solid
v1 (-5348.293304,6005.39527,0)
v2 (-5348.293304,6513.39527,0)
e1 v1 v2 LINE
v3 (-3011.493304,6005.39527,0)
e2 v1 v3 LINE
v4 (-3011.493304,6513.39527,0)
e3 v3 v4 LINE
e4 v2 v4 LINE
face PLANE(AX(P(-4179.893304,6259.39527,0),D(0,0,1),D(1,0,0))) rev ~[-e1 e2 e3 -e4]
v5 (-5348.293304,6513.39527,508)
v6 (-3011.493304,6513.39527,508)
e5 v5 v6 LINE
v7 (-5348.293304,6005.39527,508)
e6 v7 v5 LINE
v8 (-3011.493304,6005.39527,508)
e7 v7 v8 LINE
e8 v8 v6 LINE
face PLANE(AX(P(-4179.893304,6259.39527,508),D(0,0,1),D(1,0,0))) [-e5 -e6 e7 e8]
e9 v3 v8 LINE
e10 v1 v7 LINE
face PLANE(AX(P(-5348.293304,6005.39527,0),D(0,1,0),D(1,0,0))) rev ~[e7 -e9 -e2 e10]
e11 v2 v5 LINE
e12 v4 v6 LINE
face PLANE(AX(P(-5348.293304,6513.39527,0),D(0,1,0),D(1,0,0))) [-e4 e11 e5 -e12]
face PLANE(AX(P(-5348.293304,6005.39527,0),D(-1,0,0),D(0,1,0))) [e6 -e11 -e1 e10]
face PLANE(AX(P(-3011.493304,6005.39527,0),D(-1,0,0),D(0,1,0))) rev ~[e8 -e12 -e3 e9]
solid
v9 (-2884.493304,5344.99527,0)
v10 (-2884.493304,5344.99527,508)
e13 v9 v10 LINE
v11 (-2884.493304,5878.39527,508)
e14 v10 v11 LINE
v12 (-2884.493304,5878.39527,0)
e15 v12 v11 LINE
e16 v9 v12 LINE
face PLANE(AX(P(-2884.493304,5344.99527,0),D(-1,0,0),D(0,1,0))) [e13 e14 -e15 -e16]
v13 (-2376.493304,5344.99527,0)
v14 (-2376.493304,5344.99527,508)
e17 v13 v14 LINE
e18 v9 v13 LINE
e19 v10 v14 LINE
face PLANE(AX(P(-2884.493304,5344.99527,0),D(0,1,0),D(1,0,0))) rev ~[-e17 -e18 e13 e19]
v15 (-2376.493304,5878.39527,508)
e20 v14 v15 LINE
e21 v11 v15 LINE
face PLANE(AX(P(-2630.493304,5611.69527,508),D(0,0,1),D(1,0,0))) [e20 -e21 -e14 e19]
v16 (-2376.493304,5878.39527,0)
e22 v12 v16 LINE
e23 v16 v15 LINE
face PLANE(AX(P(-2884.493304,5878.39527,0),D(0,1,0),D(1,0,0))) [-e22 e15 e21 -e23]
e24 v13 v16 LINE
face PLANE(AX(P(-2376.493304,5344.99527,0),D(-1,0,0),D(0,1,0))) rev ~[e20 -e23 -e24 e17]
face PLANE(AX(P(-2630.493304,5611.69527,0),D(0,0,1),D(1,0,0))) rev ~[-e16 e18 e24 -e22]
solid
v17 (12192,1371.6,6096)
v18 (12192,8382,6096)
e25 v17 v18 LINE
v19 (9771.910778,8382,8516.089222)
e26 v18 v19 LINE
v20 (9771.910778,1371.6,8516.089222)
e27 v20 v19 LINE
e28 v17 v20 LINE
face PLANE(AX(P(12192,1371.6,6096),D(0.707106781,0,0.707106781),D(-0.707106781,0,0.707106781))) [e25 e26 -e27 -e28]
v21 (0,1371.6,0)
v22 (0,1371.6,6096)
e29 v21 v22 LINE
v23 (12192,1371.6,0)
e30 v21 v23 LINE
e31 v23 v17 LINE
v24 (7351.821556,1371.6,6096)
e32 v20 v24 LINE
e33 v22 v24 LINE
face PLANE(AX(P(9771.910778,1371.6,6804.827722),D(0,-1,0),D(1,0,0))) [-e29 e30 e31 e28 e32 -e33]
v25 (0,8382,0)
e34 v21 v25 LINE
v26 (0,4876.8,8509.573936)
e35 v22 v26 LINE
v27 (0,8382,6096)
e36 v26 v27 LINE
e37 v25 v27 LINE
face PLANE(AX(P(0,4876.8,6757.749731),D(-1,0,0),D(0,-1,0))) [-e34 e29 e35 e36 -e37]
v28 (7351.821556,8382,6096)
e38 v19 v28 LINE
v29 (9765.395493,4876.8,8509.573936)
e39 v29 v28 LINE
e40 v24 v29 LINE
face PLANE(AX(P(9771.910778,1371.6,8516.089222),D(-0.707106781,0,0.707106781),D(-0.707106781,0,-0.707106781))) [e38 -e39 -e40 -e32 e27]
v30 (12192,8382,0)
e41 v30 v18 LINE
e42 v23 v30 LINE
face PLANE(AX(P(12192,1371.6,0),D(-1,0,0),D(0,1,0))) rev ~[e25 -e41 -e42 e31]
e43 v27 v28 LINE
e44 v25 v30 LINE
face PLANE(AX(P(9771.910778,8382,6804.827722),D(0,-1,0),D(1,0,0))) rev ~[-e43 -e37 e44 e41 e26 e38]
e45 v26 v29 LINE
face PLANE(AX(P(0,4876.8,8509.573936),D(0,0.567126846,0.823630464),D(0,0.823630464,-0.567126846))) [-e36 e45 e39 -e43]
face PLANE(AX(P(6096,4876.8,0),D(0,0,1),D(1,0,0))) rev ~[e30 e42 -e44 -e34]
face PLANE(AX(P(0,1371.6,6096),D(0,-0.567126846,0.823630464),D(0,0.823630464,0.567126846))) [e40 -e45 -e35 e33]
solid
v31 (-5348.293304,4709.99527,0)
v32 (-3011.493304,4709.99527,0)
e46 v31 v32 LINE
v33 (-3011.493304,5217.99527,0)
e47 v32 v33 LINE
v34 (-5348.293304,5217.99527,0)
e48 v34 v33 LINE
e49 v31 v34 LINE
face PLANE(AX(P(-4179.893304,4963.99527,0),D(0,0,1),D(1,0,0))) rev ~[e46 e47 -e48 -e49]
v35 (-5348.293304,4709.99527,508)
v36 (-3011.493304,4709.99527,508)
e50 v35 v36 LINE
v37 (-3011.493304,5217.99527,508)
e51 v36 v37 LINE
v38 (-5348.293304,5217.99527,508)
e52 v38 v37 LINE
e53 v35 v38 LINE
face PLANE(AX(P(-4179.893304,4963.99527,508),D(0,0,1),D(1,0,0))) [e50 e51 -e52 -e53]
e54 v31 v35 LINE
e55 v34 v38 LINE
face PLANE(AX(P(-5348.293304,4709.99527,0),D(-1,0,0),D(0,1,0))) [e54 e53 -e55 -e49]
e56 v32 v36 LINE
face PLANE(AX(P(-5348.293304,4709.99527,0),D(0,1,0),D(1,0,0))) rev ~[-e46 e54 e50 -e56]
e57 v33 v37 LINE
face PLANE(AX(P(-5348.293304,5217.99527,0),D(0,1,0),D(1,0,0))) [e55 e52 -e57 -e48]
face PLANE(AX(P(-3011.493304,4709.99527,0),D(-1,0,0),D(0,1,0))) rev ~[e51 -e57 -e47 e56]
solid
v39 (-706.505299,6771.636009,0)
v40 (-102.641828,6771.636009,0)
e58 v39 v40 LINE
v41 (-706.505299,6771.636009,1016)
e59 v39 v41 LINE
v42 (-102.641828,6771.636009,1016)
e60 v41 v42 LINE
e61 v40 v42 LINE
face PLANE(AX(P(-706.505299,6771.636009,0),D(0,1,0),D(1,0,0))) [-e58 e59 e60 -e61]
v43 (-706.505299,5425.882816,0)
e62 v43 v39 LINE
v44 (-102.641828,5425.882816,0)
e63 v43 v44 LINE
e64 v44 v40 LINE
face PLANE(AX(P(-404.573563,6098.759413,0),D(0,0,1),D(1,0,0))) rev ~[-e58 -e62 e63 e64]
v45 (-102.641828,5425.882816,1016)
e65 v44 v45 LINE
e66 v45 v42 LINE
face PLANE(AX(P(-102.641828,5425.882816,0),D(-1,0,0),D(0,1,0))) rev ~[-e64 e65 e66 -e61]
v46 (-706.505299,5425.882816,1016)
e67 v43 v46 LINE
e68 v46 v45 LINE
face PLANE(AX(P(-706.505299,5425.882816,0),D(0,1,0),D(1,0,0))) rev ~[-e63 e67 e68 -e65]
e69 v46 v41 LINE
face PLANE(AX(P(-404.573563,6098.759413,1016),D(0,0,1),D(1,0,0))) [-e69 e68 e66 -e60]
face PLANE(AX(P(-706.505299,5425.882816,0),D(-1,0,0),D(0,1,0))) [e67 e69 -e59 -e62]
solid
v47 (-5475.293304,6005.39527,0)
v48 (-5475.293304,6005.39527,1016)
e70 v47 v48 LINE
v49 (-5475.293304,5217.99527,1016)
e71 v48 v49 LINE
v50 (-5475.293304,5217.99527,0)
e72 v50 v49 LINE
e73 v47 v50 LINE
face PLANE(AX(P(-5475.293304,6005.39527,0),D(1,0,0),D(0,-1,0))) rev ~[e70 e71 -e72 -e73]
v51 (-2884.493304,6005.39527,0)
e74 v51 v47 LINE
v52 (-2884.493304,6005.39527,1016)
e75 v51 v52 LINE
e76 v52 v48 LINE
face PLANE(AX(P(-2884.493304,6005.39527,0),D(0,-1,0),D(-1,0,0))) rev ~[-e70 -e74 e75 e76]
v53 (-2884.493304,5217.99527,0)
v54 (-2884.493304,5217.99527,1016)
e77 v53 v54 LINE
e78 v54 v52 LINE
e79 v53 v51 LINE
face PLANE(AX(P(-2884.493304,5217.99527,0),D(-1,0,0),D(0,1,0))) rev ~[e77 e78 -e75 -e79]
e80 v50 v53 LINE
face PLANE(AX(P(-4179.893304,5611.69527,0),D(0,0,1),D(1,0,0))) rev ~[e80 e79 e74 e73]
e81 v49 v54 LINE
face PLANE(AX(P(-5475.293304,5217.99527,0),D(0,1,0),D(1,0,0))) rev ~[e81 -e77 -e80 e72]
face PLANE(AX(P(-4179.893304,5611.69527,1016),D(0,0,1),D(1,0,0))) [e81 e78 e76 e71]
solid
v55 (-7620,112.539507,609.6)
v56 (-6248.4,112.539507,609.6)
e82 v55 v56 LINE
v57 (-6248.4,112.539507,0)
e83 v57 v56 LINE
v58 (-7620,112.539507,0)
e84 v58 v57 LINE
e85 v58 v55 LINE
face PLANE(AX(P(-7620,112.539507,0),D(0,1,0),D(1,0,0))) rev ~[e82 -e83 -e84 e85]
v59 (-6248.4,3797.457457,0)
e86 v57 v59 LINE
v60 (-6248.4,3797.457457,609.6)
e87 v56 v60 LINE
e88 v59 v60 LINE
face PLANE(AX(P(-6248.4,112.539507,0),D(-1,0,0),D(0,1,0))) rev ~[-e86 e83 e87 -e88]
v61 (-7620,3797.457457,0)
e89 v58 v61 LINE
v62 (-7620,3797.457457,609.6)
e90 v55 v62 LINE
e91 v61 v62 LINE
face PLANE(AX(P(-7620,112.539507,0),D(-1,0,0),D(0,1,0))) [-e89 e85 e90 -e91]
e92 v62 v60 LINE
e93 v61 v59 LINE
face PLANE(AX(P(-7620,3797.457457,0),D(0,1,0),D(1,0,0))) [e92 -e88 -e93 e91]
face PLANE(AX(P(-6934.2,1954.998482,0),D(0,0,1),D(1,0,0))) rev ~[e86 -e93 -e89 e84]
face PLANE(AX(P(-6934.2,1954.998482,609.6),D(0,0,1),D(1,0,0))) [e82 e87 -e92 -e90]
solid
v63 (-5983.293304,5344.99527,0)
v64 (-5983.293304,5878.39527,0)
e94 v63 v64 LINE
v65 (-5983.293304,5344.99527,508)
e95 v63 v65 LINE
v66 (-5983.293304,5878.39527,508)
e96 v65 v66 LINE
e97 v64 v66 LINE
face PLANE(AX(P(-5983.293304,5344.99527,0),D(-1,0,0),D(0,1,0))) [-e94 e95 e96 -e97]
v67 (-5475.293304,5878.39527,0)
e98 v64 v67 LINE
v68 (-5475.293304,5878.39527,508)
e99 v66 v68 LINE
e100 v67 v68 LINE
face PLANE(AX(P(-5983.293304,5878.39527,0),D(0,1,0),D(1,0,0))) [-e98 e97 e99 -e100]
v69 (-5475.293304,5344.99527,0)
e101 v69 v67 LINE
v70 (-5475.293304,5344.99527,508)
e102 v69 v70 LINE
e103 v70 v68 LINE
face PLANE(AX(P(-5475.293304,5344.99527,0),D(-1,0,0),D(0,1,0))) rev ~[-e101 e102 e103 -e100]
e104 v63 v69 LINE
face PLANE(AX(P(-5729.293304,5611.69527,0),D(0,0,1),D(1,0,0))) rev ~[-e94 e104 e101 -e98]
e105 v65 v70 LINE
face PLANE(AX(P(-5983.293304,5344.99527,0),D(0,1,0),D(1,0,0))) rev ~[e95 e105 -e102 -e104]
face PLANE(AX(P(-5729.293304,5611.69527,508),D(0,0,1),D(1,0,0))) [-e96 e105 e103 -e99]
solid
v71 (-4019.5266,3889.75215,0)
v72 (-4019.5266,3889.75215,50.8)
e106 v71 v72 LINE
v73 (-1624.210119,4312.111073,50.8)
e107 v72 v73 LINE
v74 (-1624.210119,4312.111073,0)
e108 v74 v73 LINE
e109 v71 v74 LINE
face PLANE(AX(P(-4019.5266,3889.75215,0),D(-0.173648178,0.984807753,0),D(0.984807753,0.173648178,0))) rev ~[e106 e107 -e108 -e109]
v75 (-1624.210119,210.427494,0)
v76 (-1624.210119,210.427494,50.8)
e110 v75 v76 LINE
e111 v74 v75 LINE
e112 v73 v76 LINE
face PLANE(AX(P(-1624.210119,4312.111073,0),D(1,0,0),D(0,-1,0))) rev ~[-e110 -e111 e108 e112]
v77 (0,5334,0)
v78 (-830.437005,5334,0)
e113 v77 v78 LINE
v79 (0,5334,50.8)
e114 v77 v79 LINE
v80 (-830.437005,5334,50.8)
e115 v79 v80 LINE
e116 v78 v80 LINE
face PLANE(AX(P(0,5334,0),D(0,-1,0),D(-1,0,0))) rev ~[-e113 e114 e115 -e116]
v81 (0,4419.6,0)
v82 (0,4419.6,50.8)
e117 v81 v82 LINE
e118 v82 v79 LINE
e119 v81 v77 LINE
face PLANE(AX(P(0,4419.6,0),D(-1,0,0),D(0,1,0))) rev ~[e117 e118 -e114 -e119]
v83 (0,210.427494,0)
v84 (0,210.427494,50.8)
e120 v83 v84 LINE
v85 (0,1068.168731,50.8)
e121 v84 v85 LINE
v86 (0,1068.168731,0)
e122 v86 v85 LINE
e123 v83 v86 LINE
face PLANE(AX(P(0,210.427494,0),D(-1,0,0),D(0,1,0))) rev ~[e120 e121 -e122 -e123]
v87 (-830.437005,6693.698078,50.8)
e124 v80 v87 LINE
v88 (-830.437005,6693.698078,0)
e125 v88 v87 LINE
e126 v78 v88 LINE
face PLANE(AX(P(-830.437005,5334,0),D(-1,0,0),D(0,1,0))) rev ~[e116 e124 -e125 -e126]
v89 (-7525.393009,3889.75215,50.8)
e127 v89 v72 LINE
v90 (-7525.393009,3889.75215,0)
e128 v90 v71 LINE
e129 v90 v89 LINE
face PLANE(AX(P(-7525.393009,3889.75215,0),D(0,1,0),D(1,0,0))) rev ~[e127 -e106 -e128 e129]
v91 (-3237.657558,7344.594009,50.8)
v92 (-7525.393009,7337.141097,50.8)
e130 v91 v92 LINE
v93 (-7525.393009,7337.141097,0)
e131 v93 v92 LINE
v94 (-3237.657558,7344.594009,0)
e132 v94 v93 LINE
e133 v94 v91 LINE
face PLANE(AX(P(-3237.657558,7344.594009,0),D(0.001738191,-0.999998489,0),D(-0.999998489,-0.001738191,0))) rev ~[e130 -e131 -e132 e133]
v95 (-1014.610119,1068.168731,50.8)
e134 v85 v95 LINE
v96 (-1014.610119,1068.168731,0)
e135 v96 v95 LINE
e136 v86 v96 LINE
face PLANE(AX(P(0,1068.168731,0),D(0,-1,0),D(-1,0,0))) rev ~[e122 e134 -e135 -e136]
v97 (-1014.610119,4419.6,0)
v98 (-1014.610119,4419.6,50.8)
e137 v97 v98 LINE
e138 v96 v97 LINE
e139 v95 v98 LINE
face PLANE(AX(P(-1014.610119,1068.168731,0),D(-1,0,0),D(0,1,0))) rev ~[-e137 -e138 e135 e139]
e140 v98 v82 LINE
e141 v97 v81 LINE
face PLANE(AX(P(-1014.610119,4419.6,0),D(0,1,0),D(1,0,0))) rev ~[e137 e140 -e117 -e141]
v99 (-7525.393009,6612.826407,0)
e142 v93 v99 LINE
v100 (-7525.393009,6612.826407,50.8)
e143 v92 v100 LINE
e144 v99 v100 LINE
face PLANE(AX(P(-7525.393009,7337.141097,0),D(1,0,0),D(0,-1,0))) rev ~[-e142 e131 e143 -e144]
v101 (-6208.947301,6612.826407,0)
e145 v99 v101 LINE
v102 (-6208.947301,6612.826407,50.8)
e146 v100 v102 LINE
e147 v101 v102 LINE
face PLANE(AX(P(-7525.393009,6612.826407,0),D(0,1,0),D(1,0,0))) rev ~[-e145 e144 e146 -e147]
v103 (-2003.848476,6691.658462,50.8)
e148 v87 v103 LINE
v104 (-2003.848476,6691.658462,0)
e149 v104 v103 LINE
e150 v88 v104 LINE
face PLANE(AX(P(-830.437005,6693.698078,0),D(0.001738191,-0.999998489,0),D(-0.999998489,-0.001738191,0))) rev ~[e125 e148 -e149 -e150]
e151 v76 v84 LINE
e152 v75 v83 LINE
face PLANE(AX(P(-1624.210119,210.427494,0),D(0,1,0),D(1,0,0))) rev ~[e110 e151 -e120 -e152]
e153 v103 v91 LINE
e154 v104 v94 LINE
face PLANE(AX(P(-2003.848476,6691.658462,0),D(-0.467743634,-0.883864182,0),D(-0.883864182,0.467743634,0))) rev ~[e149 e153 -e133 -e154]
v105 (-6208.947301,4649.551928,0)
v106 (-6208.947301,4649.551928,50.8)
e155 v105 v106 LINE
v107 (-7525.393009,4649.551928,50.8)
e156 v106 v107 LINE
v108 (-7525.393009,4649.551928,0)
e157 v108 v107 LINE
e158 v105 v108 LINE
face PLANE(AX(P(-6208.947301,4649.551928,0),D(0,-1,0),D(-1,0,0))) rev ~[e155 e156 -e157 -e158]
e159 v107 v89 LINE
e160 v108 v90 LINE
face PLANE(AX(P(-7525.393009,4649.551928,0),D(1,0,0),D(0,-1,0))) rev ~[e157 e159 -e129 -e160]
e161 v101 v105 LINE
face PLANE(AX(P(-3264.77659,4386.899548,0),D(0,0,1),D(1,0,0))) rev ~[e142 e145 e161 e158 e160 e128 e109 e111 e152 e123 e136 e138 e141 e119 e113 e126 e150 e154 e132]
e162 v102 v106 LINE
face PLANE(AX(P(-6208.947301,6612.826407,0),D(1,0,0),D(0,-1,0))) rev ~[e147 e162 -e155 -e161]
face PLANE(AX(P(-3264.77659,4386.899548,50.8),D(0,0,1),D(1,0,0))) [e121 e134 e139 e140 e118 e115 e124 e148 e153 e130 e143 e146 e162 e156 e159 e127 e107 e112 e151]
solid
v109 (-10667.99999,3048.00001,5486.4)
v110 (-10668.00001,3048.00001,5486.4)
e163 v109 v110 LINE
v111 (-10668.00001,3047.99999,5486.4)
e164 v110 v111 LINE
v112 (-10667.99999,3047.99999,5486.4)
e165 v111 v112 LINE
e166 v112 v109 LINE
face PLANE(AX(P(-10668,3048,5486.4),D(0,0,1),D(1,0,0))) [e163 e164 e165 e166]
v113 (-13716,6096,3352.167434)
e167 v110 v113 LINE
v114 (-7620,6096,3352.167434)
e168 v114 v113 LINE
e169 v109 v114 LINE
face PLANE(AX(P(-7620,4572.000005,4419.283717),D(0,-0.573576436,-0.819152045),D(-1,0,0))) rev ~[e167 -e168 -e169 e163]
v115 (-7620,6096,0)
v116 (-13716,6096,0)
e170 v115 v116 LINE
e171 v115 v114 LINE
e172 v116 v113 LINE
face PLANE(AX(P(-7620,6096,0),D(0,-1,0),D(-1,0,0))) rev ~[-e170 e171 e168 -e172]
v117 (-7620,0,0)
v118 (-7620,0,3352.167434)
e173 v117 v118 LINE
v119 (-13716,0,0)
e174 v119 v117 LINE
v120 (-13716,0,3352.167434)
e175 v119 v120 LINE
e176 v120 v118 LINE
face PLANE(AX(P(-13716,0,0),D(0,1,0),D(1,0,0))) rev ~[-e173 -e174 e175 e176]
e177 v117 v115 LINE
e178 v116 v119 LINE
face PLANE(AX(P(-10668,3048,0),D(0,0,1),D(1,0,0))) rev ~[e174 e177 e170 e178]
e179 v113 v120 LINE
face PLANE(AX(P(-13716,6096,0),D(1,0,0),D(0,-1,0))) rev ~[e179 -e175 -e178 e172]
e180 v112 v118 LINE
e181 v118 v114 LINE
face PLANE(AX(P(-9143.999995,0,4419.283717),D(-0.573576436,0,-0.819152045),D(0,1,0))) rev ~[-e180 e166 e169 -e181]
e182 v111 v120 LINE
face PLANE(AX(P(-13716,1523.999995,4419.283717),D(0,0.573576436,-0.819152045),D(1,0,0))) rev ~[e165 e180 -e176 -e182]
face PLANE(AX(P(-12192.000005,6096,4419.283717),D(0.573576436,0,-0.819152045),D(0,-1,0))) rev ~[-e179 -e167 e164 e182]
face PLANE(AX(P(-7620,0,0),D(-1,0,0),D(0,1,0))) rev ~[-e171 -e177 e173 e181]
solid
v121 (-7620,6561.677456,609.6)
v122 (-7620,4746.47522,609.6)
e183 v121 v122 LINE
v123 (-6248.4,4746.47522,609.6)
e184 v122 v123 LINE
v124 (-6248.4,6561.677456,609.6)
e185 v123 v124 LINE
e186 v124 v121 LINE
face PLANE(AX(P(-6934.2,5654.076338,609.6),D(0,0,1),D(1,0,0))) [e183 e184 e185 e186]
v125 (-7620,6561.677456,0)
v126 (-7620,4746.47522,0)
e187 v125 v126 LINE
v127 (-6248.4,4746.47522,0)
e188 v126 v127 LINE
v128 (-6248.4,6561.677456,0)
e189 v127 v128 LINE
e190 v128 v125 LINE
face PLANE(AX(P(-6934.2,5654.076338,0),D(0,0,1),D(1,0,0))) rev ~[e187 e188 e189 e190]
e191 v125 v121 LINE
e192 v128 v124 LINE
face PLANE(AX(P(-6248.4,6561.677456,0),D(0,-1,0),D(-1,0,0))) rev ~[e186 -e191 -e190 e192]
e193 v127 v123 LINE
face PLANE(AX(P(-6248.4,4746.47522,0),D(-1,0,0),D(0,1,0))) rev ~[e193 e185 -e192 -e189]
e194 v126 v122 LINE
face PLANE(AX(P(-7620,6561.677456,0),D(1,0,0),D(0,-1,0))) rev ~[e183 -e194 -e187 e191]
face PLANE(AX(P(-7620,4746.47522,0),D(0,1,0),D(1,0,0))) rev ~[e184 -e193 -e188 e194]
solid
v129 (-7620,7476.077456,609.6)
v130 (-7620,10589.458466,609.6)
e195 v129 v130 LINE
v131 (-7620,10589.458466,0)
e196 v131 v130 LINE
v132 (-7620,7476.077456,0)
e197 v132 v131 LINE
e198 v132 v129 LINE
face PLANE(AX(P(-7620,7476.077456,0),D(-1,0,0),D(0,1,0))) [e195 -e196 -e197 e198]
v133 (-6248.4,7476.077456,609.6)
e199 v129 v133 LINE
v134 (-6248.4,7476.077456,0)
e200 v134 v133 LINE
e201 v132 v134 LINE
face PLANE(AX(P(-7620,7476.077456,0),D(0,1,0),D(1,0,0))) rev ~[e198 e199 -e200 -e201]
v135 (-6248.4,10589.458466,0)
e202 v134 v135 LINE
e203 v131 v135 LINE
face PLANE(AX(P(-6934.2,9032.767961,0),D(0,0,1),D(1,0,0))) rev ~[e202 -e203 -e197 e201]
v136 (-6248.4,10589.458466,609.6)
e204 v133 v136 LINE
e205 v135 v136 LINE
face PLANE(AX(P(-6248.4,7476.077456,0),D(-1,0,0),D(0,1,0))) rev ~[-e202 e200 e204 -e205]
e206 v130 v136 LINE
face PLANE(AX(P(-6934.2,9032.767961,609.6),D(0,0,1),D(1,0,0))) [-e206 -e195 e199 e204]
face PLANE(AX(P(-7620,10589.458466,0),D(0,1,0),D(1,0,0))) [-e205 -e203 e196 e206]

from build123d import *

# Parameters (mm, degrees)
F0_W      = 1371.6
F0_H      = 3684.9179491401
F1_DEPTH  = 609.6
F0_H_2    = 3113.3810096741
F2_DEPTH  = 5486.4
F3_SIZE2  = 2134.232566
F3_SIZE   = 3047.99999
F0_W_2    = 12192
F0_H_3    = 7010.4
F4_DEPTH  = 6096
F6_DEPTH  = 7010.4
F10_W     = 2336.8
F10_H     = 508
F11_DEPTH = 508
F10_W_2   = 508
F10_H_2   = 533.4
F10_W_3   = 603.8634702563
F10_H_3   = 1345.7531929016
F12_DEPTH = 1016
F14_DEPTH = 50.8


# Not quite as in the source:
# - a fillet or chamfer is up to 0.001 mm smaller than in the source, because OpenCascade refuses the exact size
# - the program builds the solid bodies; features that only make, move or delete a surface that nothing else refers to are left out


with BuildPart() as f1:
    # F0 (on Top) → F1 (new body)
    with BuildSketch(Plane.XY):
        with Locations((-6934.2, 1954.9984820187)):
            Rectangle(F0_W, F0_H)
    extrude(amount=F1_DEPTH)


with BuildPart() as f1b:
    # F0 (on Top) → F1, piece 2 (new body)
    with BuildSketch(Plane.XY):
        Polygon((-7620, 6561.6774559021), (-7620, 6096), (-7620, 4746.4752197266), (-6248.4, 4746.4752197266), (-6248.4, 6561.6774559021), align=None)
    extrude(amount=F1_DEPTH)


with BuildPart() as f1c:
    # F0 (on Top) → F1, piece 3 (new body)
    with BuildSketch(Plane.XY):
        with Locations((-6934.2, 9032.7679607391)):
            Rectangle(F0_W, F0_H_2)
    extrude(amount=F1_DEPTH)


with BuildPart() as f2:
    # F0 (on Top) → F2 (new body)
    with BuildSketch(Plane.XY):
        Polygon((-13716, 0), (-7620, 0), (-7620, 112.5395074487), (-7620, 3797.4574565887), (-7620, 4746.4752197266), (-7620, 6096), (-13716, 6096), align=None)
    extrude(amount=F2_DEPTH)

    # F3 (size 3048 and 2134.2325764632 in the source; OpenCascade refuses exactly that, so slightly less here)
    f3_edges = [f2.edges().sort_by_distance(p)[0] for p in [
        (-10668, 0, 5486.4),
        (-7620, 3048, 5486.4),
        (-10668, 6096, 5486.4),
        (-13716, 3048, 5486.4),
    ]]
    f3_side = f2.faces().sort_by_distance((-10668, 3048, 5486.4))[0]
    chamfer(f3_edges, length=F3_SIZE, length2=F3_SIZE2, reference=f3_side)


with BuildPart() as f4:
    # F0 (on Top) → F4 (new body)
    with BuildSketch(Plane.XY):
        with Locations((6096, 4876.8)):
            Rectangle(F0_W_2, F0_H_3)
    extrude(amount=F4_DEPTH)

    # F5 (on face) → F6 (join, through all)
    with BuildSketch(Plane.XZ.offset(-1371.6)):
        Polygon((7351.821556229, 6096), (12192, 6096), (9771.9107781145, 8516.0892218855), align=None)
    extrude(amount=-F6_DEPTH)

    # F7 (on face) → F8 (join, up to the next surface of F4)
    with BuildSketch(Plane(origin=(0, 0, 0), x_dir=(0, -1, 0), z_dir=(-1, 0, 0))):
        Polygon((-4876.8, 8509.5739364624), (-8382, 6096), (-1371.6, 6096), align=None)
    extrude(until=Until.NEXT, dir=(1, 0, 0))


with BuildPart() as f11:
    # F10 (on Top) → F11 (new body)
    with BuildSketch(Plane.XY):
        with Locations((-4179.8933044434, 6259.3952697754)):
            Rectangle(F10_W, F10_H)
    extrude(amount=F11_DEPTH)


with BuildPart() as f11b:
    # F10 (on Top) → F11, piece 2 (new body)
    with BuildSketch(Plane.XY):
        with Locations((-5729.2933044434, 5611.6952697754)):
            Rectangle(F10_W_2, F10_H_2)
    extrude(amount=F11_DEPTH)


with BuildPart() as f11c:
    # F10 (on Top) → F11, piece 3 (new body)
    with BuildSketch(Plane.XY):
        with Locations((-4179.8933044434, 4963.9952697754)):
            Rectangle(F10_W, F10_H)
    extrude(amount=F11_DEPTH)


with BuildPart() as f11d:
    # F10 (on Top) → F11, piece 4 (new body)
    with BuildSketch(Plane.XY):
        with Locations((-2630.4933044434, 5611.6952697754)):
            Rectangle(F10_W_2, F10_H_2)
    extrude(amount=F11_DEPTH)


with BuildPart() as f12:
    # F10 (on Top) → F12 (new body)
    with BuildSketch(Plane.XY):
        with Locations((-404.5735634863, 6098.7594127655)):
            Rectangle(F10_W_3, F10_H_3)
    extrude(amount=F12_DEPTH)


with BuildPart() as f12b:
    # F10 (on Top) → F12, piece 2 (new body)
    with BuildSketch(Plane.XY):
        Polygon((-5348.2933044434, 6005.3952697754), (-5475.2933044434, 6005.3952697754), (-5475.2933044434, 5878.3952697754), (-5475.2933044434, 5344.9952697754), (-5475.2933044434, 5217.9952697754), (-5348.2933044434, 5217.9952697754), (-3011.4933044434, 5217.9952697754), (-2884.4933044434, 5217.9952697754), (-2884.4933044434, 5344.9952697754), (-2884.4933044434, 5878.3952697754), (-2884.4933044434, 6005.3952697754), (-3011.4933044434, 6005.3952697754), align=None)
    extrude(amount=F12_DEPTH)


with BuildPart() as f14:
    # F13 (on Top) → F14 (new body)
    with BuildSketch(Plane.XY):
        Polygon((0, 4419.6), (0, 5334), (-830.4370045662, 5334), (-830.4370045662, 6693.6980781448), (-2003.8484761488, 6691.6584623371), (-3237.6575581537, 7344.5940092938), (-7525.3930091858, 7337.1410968098), (-7525.3930091858, 6612.8264071736), (-6208.9473012541, 6612.8264071736), (-6208.9473012541, 4649.5519282613), (-7525.3930091858, 4649.5519282613), (-7525.3930091858, 3889.7521495819), (-4019.5266004871, 3889.7521495819), (-1624.2101192474, 4312.1110725601), (-1624.2101192474, 3889.7521495819), (-1624.2101192474, 210.4274940615), (0, 210.4274940615), (0, 1068.1687307482), (-1014.6101192474, 1068.1687307482), (-1014.6101192474, 4419.6), align=None)
    extrude(amount=F14_DEPTH)


solid = Compound([f1.part, f1b.part, f1c.part, f2.part, f4.part, f11.part, f11b.part, f11c.part, f11d.part, f12.part, f12b.part, f14.part])
